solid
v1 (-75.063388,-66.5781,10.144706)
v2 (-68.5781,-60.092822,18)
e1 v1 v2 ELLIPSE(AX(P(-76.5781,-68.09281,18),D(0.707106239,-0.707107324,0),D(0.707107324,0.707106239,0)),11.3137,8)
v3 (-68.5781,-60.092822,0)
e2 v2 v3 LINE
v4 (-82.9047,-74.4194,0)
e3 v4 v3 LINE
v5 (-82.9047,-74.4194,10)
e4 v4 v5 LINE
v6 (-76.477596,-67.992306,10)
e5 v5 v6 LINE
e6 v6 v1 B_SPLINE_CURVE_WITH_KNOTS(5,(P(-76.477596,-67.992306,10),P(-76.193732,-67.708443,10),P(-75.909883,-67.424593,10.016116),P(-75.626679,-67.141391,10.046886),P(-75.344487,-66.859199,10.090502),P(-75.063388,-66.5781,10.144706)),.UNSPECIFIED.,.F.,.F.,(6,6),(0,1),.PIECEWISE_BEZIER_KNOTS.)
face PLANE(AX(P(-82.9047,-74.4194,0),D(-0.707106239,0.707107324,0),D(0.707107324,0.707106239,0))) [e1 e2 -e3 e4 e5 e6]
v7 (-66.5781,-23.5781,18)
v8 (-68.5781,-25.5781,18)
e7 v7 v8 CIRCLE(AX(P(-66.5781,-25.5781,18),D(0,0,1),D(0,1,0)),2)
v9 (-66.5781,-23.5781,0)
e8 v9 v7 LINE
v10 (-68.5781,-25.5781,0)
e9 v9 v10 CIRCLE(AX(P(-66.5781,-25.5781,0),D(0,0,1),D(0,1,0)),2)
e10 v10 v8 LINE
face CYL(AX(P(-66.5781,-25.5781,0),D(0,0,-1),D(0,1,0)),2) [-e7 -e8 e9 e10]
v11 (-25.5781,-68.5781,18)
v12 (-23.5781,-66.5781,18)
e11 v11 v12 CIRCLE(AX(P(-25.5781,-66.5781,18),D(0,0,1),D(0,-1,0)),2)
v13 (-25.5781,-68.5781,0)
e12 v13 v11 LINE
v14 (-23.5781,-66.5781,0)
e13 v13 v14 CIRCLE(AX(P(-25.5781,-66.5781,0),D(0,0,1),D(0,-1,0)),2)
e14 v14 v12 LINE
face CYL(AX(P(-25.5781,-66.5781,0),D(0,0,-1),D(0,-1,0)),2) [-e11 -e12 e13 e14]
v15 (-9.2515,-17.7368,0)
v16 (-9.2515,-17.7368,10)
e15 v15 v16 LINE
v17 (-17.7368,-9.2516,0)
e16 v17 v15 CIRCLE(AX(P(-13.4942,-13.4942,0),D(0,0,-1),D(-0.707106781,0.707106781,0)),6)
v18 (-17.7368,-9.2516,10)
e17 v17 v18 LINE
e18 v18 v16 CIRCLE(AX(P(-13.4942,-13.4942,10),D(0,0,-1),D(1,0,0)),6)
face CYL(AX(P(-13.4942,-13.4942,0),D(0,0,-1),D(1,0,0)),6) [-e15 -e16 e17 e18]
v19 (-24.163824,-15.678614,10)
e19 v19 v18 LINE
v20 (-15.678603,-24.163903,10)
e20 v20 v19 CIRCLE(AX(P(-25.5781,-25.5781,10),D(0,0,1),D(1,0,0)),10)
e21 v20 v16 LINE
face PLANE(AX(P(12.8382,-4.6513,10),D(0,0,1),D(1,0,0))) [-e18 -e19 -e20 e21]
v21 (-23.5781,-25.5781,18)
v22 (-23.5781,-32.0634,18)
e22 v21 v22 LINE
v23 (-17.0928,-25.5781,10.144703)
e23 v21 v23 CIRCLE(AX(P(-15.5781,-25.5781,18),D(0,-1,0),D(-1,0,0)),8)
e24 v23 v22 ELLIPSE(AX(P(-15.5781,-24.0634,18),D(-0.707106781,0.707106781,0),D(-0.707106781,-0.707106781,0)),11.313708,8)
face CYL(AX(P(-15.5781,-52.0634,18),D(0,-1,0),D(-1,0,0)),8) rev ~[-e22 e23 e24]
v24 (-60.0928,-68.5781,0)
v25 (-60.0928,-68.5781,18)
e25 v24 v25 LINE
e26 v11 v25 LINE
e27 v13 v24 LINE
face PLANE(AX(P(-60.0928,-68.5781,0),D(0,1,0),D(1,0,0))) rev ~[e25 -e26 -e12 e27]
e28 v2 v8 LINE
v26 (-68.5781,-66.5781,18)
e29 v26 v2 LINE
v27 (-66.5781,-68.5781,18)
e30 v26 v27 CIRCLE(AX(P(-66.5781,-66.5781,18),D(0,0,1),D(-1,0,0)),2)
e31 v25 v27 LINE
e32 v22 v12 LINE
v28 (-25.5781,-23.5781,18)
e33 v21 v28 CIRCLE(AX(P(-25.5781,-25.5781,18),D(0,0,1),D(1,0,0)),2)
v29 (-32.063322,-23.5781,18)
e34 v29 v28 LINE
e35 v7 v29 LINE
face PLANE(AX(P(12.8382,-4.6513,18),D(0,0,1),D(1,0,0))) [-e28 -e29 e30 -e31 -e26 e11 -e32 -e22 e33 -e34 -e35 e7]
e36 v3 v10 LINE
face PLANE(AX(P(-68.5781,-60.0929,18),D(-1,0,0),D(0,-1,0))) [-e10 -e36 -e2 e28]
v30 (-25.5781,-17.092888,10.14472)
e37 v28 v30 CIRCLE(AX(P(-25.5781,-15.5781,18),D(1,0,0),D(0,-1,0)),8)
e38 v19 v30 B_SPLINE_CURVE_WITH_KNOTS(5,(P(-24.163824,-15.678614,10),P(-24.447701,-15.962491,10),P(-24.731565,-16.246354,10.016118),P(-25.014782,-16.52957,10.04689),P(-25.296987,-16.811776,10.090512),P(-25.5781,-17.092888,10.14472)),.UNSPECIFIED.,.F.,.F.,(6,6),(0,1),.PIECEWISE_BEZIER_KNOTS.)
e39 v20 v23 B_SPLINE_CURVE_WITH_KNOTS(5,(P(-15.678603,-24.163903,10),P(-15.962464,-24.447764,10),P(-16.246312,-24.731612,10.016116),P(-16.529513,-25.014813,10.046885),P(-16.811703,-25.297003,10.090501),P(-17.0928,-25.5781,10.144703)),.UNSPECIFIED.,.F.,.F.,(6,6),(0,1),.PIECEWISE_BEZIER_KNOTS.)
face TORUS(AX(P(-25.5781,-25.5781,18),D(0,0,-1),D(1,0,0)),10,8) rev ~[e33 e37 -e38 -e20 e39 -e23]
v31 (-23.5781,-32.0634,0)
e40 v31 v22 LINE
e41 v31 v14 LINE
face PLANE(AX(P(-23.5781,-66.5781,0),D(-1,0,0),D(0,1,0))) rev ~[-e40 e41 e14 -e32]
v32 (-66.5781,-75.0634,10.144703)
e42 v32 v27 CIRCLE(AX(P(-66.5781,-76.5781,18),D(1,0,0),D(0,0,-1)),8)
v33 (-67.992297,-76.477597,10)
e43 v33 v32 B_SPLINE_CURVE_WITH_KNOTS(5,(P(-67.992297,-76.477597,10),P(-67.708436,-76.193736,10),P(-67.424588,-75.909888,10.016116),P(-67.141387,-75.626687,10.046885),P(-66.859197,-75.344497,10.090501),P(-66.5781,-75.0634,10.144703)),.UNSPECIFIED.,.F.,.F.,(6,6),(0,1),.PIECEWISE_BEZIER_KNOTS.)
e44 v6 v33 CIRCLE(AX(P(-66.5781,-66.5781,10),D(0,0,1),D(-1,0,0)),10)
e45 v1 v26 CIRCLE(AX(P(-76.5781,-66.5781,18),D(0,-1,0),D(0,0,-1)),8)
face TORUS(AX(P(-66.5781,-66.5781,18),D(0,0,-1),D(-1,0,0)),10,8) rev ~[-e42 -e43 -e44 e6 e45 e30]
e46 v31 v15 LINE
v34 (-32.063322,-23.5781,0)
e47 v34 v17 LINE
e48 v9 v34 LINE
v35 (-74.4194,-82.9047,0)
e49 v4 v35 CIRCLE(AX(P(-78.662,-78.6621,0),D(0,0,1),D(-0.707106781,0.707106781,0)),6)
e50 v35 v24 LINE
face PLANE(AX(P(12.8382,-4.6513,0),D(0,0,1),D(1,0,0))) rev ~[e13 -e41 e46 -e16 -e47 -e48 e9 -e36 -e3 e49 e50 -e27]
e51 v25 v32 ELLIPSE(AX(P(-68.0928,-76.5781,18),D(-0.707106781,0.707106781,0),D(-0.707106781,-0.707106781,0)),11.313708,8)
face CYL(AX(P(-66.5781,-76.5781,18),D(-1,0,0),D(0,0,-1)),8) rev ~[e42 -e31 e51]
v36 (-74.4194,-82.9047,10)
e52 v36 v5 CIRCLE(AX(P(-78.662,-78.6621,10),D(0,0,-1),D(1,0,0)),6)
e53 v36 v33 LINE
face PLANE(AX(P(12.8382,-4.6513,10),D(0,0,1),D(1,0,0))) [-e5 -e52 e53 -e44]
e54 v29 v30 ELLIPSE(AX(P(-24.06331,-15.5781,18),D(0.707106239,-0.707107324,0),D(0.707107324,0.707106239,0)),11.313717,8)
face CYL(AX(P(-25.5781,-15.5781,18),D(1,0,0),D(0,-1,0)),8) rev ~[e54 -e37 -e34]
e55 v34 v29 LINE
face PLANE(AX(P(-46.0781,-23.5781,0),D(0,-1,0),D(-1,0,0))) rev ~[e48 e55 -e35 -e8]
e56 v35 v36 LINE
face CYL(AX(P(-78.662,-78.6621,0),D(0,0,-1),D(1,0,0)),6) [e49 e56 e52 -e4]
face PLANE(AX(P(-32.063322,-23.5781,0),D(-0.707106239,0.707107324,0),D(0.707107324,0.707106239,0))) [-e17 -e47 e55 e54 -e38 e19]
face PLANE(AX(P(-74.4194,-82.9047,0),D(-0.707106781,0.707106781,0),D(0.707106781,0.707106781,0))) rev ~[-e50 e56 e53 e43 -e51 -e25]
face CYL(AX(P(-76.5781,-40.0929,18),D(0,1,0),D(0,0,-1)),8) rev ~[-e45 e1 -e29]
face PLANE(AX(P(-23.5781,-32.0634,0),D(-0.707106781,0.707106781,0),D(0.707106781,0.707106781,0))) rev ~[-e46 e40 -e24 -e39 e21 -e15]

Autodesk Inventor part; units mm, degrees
ref_plane "YZ Plane" through (0, 0, 0) normal (1, 0, 0) x (0, 1, 0)
ref_plane "XZ Plane" through (0, 0, 0) normal (0, 1, 0) x (-1, 0, 0)
ref_plane "XY Plane" through (0, 0, 0) normal (0, 0, 1) x (1, 0, 0)
ref_plane "Work Plane1" through (12.8382, -4.6513, 0) normal (0, 0, 1) x (1, 0, 0)
sketch "Sketch1" plane through (12.8382, -4.6513, 0) normal (0, 0, 1) x (1, 0, 0)
  circle A0 centre (-91.5002, -74.0108) radius 6
  circle A1 centre (-26.3324, -8.8429) radius 6
  ellipse E0 centre (-91.5002, -74.0108) end of major axis (-87.52, -70.0305) minor radius 5.6 (-97.1147, -74.0397) -> (-91.5291, -79.6253) ccw projected
  line L0 (-67.9442, -79.6253) -> (-91.5291, -79.6253) projected
  line L1 (-67.9442, -79.6253) -> (-49.8884, -79.6253) projected
  line L2 (-26.3034, -79.6253) -> (-49.8884, -79.6253) projected
  ellipse E1 centre (-26.3324, -74.0108) end of major axis (-22.3521, -77.991) minor radius 5.6 (-26.3034, -79.6253) -> (-20.7179, -74.0397) ccw projected
  line L3 (-20.7179, -8.814) -> (-20.7179, -74.0397) projected
  ellipse E2 centre (-26.3324, -8.8429) end of major axis (-22.3521, -4.8627) minor radius 5.6 (-20.7179, -8.814) -> (-26.3034, -3.2284) ccw projected
  line L4 (-91.5291, -3.2284) -> (-26.3034, -3.2284) projected
  ellipse E3 centre (-91.5002, -8.8429) end of major axis (-87.52, -12.8231) minor radius 5.6 (-91.5291, -3.2284) -> (-97.1147, -8.814) ccw projected
  line L5 (-97.1147, -74.0397) -> (-97.1147, -8.814) projected
  line L6 (-79.4163, -63.9268) -> (-38.4163, -63.9268)
  line L7 (-36.4163, -61.9268) -> (-36.4163, -20.9268)
  line L8 (-38.4163, -18.9268) -> (-79.4163, -18.9268)
  line L9 (-81.4163, -20.9268) -> (-81.4163, -61.9268)
  line L10 (-58.9163, -79.6253) -> (-58.9163, -3.2284)
  line L11 (-97.1147, -41.4268) -> (-20.7179, -41.4268)
  arc A2 (-81.4163, -61.9268) -> (-79.4163, -63.9268) centre (-79.4163, -61.9268) ccw
  arc A3 (-38.4163, -63.9268) -> (-36.4163, -61.9268) centre (-38.4163, -61.9268) ccw
  arc A4 (-36.4163, -20.9268) -> (-38.4163, -18.9268) centre (-38.4163, -20.9268) ccw
  arc A5 (-79.4163, -18.9268) -> (-81.4163, -20.9268) centre (-79.4163, -20.9268) ccw
  line L12 (-87.2576, -78.2534) -> (-22.0897, -13.0855)
  line L13 (-95.7429, -69.7681) -> (-30.575, -4.6003)
  point P0 (-12.8382, 4.6513)
  point P1 (-81.4163, -63.9268)
  point P2 (-36.4163, -18.9268)
  point P3 (-36.4163, -63.9268)
  point P4 (-72.931, -63.9268)
  point P5 (-36.4163, -27.4121)
  point P6 (-44.9016, -18.9268)
  point P7 (-81.4163, -55.4416)
  point P8 (-29.8782, -23.5781)
  point P9 (-75.1162, -63.9268)
  dimension "d0" = 12
  dimension "d1" = 12
  dimension "d2" = 45
  dimension "d3" = 45
  dimension "d4" = 2
extrude "Extrusion1" add sketch "Sketch1" along normal blind 18 contours A0 L0 E0 L5 | A0 L13 L9 A2 L6 L12 | L5 E0 L0 A0 | L13 L11 L10 L12 L6 A2 L9 | L9 L11 L13 | L12 L10 L6 | L9 A5 L8 L10 L13 L11 | L13 L10 L11 | L10 L12 L11 L7 A3 L6 | L10 L11 L12 | L10 L13 L8 A4 L7 L12 L11 | L10 L8 L13 | L12 L7 L11 | L13 A1 L12 L7 A4 L8 | A1 L4 E2 L3 | A1 L3 E2 L4
sketch "Sketch2" plane through (12.8382, -4.6513, 18) normal (0, 0, 1) x (1, 0, 0)
  line L0 (-44.9016, -18.9268) -> (-79.4163, -18.9268) projected
  arc A0 (-79.4163, -18.9268) -> (-81.4163, -20.9268) centre (-79.4163, -20.9268) ccw projected
  line L1 (-81.4163, -20.9268) -> (-81.4163, -55.4416) projected
  line L2 (-36.4163, -61.9268) -> (-36.4163, -27.4121) projected
  arc A1 (-38.4163, -63.9268) -> (-36.4163, -61.9268) centre (-38.4163, -61.9268) ccw projected
  line L3 (-72.931, -63.9268) -> (-38.4163, -63.9268) projected
  line L4 (-62.1589, -18.9268) -> (-55.6737, -63.9268)
  line L5 (-36.4163, -44.6695) -> (-81.4163, -38.1842)
  line L6 (-44.9016, -18.9268) -> (-79.4163, -18.9268)
  line L7 (-81.4163, -20.9268) -> (-81.4163, -55.4416)
  arc A2 (-79.4163, -18.9268) -> (-81.4163, -20.9268) centre (-79.4163, -20.9268) ccw
  line L8 (-81.4163, -27.4121) -> (-81.4163, -61.9268)
  arc A3 (-81.4163, -61.9268) -> (-79.4163, -63.9268) centre (-79.4163, -61.9268) ccw
  line L9 (-79.4163, -63.9268) -> (-44.9016, -63.9268)
  line L10 (-72.931, -63.9268) -> (-38.4163, -63.9268)
  arc A4 (-38.4163, -63.9268) -> (-36.4163, -61.9268) centre (-38.4163, -61.9268) ccw
  line L11 (-36.4163, -61.9268) -> (-36.4163, -27.4121)
  line L12 (-36.4163, -55.4416) -> (-36.4163, -20.9268)
  arc A5 (-36.4163, -20.9268) -> (-38.4163, -18.9268) centre (-38.4163, -20.9268) ccw
  line L13 (-38.4163, -18.9268) -> (-72.931, -18.9268)
  line L14 (-81.4163, -55.4416) -> (-100.4764, -69.4227)
  line L15 (-100.4764, -69.4227) -> (-100.4764, -80.6902)
  line L16 (-100.4764, -80.6902) -> (-89.2076, -83.945)
  line L17 (-89.2076, -83.945) -> (-75.1931, -71.7586)
  line L18 (-75.1931, -71.7586) -> (-72.931, -63.9268)
  line L19 (-44.9016, -18.9268) -> (-41.3617, -6.671)
  line L20 (-41.3617, -6.671) -> (-27.2892, 1.0126)
  line L21 (-27.2892, 1.0126) -> (-19.5179, 0.2355)
  line L22 (-19.5179, 0.2355) -> (-4.3296, -12.1655)
  line L23 (-4.3296, -12.1655) -> (-5.4222, -23.0912)
  line L24 (-5.4222, -23.0912) -> (-36.4163, -27.4121)
  point P0 (-12.8382, 4.6513)
  point P1 (-58.9163, -41.4268)
  point P2 (-81.4163, -55.4416)
  point P3 (-72.931, -63.9268)
  point P4 (-36.4163, -27.4121)
  point P5 (-43.7192, -14.8334)
  point P6 (-32.0634, -23.5781)
  point P7 (-25.5781, -68.5781)
  point P8 (-23.5781, -32.0634)
  point P9 (-32.0634, -23.5781)
  point P10 (-38.4163, -63.9268)
  dimension "d9" = 360
extrude "Extrusion2" cut sketch "Sketch2" against normal blind 8 contours L19 L20 L21 L22 L23 L24 L12 A5 L13 | L18 L17 L16 L15 L14 L8 A3 L9
fillet "Fillet1" radius 8 6 edges at (-28.8207, -23.5781, 10) (-23.5781, -28.8207, 10) (-24.1639, -24.1639, 10) (-63.3355, -68.5781, 10) (-68.5781, -63.3355, 10) (-67.9923, -67.9923, 10)
equation "\"d1\" = d0"
equation "\"d3\" = d2"
properties part number "base" material "ABS Plastic"
